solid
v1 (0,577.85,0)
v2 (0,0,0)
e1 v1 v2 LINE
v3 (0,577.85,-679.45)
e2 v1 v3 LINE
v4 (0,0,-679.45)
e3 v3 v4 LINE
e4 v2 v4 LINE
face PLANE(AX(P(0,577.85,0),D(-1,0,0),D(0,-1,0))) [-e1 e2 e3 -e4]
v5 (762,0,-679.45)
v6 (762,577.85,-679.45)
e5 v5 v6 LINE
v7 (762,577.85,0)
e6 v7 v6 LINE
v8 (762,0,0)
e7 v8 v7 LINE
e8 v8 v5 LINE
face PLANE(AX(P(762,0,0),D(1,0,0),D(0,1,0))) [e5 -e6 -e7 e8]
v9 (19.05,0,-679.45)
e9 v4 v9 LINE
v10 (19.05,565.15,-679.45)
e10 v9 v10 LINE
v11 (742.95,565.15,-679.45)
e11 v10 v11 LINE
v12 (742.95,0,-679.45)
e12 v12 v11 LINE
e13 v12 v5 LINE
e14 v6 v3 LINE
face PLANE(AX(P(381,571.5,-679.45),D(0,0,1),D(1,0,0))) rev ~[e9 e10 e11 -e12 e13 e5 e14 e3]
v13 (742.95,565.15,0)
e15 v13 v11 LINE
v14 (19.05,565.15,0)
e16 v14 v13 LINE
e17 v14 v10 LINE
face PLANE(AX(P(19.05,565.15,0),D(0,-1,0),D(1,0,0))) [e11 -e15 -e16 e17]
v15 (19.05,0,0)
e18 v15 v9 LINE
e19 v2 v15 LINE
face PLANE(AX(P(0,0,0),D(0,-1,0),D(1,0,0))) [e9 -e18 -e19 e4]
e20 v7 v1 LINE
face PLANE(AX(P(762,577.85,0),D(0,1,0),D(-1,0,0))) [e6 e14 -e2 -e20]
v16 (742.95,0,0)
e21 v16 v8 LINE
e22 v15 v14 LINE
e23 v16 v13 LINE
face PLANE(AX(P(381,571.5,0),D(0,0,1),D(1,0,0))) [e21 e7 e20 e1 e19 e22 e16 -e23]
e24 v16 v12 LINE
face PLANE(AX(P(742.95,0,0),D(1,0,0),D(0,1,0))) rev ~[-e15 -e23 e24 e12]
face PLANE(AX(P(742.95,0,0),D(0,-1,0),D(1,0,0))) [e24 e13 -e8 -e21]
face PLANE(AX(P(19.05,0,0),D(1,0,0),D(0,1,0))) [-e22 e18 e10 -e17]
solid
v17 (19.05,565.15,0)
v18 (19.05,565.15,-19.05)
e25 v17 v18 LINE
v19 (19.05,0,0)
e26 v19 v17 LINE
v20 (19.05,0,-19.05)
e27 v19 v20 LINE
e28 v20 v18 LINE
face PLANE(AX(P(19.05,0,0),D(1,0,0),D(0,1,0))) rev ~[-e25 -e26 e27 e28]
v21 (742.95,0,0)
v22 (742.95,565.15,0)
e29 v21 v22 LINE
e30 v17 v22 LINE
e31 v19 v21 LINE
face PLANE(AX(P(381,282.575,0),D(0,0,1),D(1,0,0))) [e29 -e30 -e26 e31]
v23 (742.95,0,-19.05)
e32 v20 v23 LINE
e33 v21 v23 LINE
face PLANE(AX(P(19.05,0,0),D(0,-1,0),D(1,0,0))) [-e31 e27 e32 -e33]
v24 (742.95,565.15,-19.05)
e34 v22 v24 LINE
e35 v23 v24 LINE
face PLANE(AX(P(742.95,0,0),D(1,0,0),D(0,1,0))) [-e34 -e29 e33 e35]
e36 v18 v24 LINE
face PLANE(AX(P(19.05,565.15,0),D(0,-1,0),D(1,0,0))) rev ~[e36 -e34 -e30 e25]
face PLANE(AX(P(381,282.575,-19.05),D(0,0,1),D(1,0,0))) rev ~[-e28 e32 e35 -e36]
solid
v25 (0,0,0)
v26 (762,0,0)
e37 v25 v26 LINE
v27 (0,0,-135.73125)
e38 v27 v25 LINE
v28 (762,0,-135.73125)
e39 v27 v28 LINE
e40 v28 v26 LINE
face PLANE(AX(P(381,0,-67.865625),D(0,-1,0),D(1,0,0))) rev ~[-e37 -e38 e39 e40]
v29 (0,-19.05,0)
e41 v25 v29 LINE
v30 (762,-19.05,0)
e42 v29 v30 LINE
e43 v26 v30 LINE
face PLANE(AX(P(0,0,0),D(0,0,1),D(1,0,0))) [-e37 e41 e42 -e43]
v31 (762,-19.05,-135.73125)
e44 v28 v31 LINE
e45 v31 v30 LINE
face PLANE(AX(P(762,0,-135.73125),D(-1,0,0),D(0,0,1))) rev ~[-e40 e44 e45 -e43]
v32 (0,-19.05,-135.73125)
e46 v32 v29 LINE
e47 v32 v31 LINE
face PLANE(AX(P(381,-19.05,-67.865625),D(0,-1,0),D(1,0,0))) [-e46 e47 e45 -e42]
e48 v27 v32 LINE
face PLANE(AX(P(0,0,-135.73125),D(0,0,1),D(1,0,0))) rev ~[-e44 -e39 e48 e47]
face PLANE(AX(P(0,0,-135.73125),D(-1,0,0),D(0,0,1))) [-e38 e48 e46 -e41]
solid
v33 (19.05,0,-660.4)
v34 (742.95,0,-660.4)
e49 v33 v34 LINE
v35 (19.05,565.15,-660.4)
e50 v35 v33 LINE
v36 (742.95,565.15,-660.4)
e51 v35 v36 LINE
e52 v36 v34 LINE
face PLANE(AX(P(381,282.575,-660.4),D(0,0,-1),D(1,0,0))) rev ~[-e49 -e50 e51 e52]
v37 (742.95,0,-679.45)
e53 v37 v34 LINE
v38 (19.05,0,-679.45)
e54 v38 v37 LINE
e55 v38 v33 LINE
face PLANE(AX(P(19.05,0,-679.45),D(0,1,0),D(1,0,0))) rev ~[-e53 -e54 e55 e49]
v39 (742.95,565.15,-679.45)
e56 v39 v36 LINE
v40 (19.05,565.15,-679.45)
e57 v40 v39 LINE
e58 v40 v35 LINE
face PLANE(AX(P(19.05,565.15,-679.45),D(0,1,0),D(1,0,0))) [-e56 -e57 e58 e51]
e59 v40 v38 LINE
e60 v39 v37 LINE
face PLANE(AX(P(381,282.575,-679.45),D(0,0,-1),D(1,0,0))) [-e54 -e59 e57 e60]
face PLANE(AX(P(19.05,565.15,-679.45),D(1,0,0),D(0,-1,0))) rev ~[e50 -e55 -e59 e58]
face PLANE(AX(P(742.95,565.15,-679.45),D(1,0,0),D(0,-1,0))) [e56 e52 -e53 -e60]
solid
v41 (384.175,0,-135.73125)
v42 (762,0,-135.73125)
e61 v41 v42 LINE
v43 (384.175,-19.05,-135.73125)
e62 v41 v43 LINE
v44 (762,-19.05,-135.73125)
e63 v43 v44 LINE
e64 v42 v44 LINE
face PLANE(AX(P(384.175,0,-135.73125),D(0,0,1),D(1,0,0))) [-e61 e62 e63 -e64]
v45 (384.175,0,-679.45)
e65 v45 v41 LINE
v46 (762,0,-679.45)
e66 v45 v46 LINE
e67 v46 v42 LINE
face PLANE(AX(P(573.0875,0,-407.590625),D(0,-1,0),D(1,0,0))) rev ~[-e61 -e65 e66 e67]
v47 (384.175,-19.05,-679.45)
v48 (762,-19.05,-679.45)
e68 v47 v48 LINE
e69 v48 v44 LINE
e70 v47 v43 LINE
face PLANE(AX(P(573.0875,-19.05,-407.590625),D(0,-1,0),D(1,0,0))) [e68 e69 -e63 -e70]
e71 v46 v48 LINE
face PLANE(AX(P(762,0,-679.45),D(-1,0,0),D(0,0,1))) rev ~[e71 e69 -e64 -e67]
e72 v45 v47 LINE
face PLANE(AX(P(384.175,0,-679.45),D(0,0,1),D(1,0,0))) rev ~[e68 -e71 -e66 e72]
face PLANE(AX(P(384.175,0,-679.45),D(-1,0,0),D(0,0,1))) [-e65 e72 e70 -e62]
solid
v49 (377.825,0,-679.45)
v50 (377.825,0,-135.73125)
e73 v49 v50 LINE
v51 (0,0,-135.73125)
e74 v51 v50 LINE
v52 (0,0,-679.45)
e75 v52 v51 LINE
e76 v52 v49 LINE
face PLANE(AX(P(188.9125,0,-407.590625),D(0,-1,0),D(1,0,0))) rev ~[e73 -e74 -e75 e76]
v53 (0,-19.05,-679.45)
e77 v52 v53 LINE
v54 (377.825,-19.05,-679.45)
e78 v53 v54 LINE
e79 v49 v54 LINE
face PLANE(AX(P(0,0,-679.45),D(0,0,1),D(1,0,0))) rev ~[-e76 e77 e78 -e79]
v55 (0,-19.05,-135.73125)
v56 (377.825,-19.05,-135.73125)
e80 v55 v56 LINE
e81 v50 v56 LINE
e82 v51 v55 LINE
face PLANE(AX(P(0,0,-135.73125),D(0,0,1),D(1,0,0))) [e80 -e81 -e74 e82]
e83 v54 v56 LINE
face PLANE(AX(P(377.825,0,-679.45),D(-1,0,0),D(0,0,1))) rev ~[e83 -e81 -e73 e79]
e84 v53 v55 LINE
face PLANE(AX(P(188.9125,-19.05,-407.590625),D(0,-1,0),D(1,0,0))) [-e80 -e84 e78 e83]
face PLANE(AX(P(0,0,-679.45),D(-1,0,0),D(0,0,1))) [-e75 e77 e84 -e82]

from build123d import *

# Parameters (mm, degrees)
F4_W      = 19.05
F4_H      = 565.15
F5_DEPTH  = 679.45
F6_W      = 723.9
F6_H      = 565.15
F7_DEPTH  = 19.05
F8_W      = 723.9
F8_H      = 565.15
F9_DEPTH  = 19.05
F10_W     = 762
F10_H     = 135.73125
F11_DEPTH = 19.05
F12_W     = 723.9
F12_H     = 19.05
F13_DEPTH = 565.15
F15_DEPTH = 19.05
F19_W     = 377.825
F19_H     = 543.71875
F20_DEPTH = 19.05


# Not quite as in the source:
# - a variable given as a bare number and used for a length is read in inches; the dataset says mm whatever the document's units were


with BuildPart() as f5:
    # F4 (on Top) → F5 (new body)
    with BuildSketch(Plane.XY):
        Polygon((762, 577.85), (0, 577.85), (0, 565.15), (19.05, 565.15), (742.95, 565.15), (762, 565.15), align=None)
        with Locations((9.525, 282.575)):
            Rectangle(F4_W, F4_H)
        with Locations((752.475, 282.575)):
            Rectangle(F4_W, F4_H)
    extrude(amount=-F5_DEPTH)


with BuildPart() as f7:
    # F6 (on Top) → F7 (new body)
    with BuildSketch(Plane.XY):
        with Locations((381, 282.575)):
            Rectangle(F6_W, F6_H)
    extrude(amount=-F7_DEPTH)


with BuildPart() as f9:
    # F8 (on face) → F9 (new body)
    with BuildSketch(Plane(origin=(0, 0, -679.45), x_dir=(1, 0, 0), z_dir=(0, 0, -1))):
        with Locations((381, -282.575)):
            Rectangle(F8_W, F8_H)
    extrude(amount=-F9_DEPTH)


with BuildPart() as f11:
    # F10 (on face) → F11 (new body)
    with BuildSketch(Plane.XZ):
        with Locations((381, -67.865625)):
            Rectangle(F10_W, F10_H)
    extrude(amount=F11_DEPTH)


with BuildPart() as f13:
    # F12 (on face) → F13 (new body)
    with BuildSketch(Plane.XZ.offset(-565.15)):
        with Locations((381, -349.25)):
            Rectangle(F12_W, F12_H)
    extrude(amount=F13_DEPTH)


with BuildPart() as f15:
    # F14 (on face) → F15 (new body)
    with BuildSketch(Plane.XZ):
        Polygon((762, -135.73125), (742.95, -135.73125), (742.95, -339.725), (742.95, -358.775), (742.95, -660.4), (742.95, -679.45), (762, -679.45), align=None)
        Polygon((742.95, -358.775), (742.95, -339.725), (19.05, -339.725), (19.05, -135.73125), (0, -135.73125), (0, -679.45), (19.05, -679.45), (742.95, -679.45), (742.95, -660.4), (19.05, -660.4), (19.05, -358.775), align=None)
    extrude(amount=F15_DEPTH)


with BuildPart() as f20:
    # F19 (on Front) → F20 (new body)
    with BuildSketch(Plane.XZ):
        with Locations((188.9125, -407.590625)):
            Rectangle(F19_W, F19_H)
    extrude(amount=F20_DEPTH)


with BuildPart() as f20b:
    # F19 (on Front) → F20, piece 2 (new body)
    with BuildSketch(Plane.XZ):
        with Locations((573.0875, -407.590625)):
            Rectangle(F19_W, F19_H)
    extrude(amount=F20_DEPTH)


solid = Compound([f5.part, f7.part, f9.part, f11.part, f20.part, f20b.part])
